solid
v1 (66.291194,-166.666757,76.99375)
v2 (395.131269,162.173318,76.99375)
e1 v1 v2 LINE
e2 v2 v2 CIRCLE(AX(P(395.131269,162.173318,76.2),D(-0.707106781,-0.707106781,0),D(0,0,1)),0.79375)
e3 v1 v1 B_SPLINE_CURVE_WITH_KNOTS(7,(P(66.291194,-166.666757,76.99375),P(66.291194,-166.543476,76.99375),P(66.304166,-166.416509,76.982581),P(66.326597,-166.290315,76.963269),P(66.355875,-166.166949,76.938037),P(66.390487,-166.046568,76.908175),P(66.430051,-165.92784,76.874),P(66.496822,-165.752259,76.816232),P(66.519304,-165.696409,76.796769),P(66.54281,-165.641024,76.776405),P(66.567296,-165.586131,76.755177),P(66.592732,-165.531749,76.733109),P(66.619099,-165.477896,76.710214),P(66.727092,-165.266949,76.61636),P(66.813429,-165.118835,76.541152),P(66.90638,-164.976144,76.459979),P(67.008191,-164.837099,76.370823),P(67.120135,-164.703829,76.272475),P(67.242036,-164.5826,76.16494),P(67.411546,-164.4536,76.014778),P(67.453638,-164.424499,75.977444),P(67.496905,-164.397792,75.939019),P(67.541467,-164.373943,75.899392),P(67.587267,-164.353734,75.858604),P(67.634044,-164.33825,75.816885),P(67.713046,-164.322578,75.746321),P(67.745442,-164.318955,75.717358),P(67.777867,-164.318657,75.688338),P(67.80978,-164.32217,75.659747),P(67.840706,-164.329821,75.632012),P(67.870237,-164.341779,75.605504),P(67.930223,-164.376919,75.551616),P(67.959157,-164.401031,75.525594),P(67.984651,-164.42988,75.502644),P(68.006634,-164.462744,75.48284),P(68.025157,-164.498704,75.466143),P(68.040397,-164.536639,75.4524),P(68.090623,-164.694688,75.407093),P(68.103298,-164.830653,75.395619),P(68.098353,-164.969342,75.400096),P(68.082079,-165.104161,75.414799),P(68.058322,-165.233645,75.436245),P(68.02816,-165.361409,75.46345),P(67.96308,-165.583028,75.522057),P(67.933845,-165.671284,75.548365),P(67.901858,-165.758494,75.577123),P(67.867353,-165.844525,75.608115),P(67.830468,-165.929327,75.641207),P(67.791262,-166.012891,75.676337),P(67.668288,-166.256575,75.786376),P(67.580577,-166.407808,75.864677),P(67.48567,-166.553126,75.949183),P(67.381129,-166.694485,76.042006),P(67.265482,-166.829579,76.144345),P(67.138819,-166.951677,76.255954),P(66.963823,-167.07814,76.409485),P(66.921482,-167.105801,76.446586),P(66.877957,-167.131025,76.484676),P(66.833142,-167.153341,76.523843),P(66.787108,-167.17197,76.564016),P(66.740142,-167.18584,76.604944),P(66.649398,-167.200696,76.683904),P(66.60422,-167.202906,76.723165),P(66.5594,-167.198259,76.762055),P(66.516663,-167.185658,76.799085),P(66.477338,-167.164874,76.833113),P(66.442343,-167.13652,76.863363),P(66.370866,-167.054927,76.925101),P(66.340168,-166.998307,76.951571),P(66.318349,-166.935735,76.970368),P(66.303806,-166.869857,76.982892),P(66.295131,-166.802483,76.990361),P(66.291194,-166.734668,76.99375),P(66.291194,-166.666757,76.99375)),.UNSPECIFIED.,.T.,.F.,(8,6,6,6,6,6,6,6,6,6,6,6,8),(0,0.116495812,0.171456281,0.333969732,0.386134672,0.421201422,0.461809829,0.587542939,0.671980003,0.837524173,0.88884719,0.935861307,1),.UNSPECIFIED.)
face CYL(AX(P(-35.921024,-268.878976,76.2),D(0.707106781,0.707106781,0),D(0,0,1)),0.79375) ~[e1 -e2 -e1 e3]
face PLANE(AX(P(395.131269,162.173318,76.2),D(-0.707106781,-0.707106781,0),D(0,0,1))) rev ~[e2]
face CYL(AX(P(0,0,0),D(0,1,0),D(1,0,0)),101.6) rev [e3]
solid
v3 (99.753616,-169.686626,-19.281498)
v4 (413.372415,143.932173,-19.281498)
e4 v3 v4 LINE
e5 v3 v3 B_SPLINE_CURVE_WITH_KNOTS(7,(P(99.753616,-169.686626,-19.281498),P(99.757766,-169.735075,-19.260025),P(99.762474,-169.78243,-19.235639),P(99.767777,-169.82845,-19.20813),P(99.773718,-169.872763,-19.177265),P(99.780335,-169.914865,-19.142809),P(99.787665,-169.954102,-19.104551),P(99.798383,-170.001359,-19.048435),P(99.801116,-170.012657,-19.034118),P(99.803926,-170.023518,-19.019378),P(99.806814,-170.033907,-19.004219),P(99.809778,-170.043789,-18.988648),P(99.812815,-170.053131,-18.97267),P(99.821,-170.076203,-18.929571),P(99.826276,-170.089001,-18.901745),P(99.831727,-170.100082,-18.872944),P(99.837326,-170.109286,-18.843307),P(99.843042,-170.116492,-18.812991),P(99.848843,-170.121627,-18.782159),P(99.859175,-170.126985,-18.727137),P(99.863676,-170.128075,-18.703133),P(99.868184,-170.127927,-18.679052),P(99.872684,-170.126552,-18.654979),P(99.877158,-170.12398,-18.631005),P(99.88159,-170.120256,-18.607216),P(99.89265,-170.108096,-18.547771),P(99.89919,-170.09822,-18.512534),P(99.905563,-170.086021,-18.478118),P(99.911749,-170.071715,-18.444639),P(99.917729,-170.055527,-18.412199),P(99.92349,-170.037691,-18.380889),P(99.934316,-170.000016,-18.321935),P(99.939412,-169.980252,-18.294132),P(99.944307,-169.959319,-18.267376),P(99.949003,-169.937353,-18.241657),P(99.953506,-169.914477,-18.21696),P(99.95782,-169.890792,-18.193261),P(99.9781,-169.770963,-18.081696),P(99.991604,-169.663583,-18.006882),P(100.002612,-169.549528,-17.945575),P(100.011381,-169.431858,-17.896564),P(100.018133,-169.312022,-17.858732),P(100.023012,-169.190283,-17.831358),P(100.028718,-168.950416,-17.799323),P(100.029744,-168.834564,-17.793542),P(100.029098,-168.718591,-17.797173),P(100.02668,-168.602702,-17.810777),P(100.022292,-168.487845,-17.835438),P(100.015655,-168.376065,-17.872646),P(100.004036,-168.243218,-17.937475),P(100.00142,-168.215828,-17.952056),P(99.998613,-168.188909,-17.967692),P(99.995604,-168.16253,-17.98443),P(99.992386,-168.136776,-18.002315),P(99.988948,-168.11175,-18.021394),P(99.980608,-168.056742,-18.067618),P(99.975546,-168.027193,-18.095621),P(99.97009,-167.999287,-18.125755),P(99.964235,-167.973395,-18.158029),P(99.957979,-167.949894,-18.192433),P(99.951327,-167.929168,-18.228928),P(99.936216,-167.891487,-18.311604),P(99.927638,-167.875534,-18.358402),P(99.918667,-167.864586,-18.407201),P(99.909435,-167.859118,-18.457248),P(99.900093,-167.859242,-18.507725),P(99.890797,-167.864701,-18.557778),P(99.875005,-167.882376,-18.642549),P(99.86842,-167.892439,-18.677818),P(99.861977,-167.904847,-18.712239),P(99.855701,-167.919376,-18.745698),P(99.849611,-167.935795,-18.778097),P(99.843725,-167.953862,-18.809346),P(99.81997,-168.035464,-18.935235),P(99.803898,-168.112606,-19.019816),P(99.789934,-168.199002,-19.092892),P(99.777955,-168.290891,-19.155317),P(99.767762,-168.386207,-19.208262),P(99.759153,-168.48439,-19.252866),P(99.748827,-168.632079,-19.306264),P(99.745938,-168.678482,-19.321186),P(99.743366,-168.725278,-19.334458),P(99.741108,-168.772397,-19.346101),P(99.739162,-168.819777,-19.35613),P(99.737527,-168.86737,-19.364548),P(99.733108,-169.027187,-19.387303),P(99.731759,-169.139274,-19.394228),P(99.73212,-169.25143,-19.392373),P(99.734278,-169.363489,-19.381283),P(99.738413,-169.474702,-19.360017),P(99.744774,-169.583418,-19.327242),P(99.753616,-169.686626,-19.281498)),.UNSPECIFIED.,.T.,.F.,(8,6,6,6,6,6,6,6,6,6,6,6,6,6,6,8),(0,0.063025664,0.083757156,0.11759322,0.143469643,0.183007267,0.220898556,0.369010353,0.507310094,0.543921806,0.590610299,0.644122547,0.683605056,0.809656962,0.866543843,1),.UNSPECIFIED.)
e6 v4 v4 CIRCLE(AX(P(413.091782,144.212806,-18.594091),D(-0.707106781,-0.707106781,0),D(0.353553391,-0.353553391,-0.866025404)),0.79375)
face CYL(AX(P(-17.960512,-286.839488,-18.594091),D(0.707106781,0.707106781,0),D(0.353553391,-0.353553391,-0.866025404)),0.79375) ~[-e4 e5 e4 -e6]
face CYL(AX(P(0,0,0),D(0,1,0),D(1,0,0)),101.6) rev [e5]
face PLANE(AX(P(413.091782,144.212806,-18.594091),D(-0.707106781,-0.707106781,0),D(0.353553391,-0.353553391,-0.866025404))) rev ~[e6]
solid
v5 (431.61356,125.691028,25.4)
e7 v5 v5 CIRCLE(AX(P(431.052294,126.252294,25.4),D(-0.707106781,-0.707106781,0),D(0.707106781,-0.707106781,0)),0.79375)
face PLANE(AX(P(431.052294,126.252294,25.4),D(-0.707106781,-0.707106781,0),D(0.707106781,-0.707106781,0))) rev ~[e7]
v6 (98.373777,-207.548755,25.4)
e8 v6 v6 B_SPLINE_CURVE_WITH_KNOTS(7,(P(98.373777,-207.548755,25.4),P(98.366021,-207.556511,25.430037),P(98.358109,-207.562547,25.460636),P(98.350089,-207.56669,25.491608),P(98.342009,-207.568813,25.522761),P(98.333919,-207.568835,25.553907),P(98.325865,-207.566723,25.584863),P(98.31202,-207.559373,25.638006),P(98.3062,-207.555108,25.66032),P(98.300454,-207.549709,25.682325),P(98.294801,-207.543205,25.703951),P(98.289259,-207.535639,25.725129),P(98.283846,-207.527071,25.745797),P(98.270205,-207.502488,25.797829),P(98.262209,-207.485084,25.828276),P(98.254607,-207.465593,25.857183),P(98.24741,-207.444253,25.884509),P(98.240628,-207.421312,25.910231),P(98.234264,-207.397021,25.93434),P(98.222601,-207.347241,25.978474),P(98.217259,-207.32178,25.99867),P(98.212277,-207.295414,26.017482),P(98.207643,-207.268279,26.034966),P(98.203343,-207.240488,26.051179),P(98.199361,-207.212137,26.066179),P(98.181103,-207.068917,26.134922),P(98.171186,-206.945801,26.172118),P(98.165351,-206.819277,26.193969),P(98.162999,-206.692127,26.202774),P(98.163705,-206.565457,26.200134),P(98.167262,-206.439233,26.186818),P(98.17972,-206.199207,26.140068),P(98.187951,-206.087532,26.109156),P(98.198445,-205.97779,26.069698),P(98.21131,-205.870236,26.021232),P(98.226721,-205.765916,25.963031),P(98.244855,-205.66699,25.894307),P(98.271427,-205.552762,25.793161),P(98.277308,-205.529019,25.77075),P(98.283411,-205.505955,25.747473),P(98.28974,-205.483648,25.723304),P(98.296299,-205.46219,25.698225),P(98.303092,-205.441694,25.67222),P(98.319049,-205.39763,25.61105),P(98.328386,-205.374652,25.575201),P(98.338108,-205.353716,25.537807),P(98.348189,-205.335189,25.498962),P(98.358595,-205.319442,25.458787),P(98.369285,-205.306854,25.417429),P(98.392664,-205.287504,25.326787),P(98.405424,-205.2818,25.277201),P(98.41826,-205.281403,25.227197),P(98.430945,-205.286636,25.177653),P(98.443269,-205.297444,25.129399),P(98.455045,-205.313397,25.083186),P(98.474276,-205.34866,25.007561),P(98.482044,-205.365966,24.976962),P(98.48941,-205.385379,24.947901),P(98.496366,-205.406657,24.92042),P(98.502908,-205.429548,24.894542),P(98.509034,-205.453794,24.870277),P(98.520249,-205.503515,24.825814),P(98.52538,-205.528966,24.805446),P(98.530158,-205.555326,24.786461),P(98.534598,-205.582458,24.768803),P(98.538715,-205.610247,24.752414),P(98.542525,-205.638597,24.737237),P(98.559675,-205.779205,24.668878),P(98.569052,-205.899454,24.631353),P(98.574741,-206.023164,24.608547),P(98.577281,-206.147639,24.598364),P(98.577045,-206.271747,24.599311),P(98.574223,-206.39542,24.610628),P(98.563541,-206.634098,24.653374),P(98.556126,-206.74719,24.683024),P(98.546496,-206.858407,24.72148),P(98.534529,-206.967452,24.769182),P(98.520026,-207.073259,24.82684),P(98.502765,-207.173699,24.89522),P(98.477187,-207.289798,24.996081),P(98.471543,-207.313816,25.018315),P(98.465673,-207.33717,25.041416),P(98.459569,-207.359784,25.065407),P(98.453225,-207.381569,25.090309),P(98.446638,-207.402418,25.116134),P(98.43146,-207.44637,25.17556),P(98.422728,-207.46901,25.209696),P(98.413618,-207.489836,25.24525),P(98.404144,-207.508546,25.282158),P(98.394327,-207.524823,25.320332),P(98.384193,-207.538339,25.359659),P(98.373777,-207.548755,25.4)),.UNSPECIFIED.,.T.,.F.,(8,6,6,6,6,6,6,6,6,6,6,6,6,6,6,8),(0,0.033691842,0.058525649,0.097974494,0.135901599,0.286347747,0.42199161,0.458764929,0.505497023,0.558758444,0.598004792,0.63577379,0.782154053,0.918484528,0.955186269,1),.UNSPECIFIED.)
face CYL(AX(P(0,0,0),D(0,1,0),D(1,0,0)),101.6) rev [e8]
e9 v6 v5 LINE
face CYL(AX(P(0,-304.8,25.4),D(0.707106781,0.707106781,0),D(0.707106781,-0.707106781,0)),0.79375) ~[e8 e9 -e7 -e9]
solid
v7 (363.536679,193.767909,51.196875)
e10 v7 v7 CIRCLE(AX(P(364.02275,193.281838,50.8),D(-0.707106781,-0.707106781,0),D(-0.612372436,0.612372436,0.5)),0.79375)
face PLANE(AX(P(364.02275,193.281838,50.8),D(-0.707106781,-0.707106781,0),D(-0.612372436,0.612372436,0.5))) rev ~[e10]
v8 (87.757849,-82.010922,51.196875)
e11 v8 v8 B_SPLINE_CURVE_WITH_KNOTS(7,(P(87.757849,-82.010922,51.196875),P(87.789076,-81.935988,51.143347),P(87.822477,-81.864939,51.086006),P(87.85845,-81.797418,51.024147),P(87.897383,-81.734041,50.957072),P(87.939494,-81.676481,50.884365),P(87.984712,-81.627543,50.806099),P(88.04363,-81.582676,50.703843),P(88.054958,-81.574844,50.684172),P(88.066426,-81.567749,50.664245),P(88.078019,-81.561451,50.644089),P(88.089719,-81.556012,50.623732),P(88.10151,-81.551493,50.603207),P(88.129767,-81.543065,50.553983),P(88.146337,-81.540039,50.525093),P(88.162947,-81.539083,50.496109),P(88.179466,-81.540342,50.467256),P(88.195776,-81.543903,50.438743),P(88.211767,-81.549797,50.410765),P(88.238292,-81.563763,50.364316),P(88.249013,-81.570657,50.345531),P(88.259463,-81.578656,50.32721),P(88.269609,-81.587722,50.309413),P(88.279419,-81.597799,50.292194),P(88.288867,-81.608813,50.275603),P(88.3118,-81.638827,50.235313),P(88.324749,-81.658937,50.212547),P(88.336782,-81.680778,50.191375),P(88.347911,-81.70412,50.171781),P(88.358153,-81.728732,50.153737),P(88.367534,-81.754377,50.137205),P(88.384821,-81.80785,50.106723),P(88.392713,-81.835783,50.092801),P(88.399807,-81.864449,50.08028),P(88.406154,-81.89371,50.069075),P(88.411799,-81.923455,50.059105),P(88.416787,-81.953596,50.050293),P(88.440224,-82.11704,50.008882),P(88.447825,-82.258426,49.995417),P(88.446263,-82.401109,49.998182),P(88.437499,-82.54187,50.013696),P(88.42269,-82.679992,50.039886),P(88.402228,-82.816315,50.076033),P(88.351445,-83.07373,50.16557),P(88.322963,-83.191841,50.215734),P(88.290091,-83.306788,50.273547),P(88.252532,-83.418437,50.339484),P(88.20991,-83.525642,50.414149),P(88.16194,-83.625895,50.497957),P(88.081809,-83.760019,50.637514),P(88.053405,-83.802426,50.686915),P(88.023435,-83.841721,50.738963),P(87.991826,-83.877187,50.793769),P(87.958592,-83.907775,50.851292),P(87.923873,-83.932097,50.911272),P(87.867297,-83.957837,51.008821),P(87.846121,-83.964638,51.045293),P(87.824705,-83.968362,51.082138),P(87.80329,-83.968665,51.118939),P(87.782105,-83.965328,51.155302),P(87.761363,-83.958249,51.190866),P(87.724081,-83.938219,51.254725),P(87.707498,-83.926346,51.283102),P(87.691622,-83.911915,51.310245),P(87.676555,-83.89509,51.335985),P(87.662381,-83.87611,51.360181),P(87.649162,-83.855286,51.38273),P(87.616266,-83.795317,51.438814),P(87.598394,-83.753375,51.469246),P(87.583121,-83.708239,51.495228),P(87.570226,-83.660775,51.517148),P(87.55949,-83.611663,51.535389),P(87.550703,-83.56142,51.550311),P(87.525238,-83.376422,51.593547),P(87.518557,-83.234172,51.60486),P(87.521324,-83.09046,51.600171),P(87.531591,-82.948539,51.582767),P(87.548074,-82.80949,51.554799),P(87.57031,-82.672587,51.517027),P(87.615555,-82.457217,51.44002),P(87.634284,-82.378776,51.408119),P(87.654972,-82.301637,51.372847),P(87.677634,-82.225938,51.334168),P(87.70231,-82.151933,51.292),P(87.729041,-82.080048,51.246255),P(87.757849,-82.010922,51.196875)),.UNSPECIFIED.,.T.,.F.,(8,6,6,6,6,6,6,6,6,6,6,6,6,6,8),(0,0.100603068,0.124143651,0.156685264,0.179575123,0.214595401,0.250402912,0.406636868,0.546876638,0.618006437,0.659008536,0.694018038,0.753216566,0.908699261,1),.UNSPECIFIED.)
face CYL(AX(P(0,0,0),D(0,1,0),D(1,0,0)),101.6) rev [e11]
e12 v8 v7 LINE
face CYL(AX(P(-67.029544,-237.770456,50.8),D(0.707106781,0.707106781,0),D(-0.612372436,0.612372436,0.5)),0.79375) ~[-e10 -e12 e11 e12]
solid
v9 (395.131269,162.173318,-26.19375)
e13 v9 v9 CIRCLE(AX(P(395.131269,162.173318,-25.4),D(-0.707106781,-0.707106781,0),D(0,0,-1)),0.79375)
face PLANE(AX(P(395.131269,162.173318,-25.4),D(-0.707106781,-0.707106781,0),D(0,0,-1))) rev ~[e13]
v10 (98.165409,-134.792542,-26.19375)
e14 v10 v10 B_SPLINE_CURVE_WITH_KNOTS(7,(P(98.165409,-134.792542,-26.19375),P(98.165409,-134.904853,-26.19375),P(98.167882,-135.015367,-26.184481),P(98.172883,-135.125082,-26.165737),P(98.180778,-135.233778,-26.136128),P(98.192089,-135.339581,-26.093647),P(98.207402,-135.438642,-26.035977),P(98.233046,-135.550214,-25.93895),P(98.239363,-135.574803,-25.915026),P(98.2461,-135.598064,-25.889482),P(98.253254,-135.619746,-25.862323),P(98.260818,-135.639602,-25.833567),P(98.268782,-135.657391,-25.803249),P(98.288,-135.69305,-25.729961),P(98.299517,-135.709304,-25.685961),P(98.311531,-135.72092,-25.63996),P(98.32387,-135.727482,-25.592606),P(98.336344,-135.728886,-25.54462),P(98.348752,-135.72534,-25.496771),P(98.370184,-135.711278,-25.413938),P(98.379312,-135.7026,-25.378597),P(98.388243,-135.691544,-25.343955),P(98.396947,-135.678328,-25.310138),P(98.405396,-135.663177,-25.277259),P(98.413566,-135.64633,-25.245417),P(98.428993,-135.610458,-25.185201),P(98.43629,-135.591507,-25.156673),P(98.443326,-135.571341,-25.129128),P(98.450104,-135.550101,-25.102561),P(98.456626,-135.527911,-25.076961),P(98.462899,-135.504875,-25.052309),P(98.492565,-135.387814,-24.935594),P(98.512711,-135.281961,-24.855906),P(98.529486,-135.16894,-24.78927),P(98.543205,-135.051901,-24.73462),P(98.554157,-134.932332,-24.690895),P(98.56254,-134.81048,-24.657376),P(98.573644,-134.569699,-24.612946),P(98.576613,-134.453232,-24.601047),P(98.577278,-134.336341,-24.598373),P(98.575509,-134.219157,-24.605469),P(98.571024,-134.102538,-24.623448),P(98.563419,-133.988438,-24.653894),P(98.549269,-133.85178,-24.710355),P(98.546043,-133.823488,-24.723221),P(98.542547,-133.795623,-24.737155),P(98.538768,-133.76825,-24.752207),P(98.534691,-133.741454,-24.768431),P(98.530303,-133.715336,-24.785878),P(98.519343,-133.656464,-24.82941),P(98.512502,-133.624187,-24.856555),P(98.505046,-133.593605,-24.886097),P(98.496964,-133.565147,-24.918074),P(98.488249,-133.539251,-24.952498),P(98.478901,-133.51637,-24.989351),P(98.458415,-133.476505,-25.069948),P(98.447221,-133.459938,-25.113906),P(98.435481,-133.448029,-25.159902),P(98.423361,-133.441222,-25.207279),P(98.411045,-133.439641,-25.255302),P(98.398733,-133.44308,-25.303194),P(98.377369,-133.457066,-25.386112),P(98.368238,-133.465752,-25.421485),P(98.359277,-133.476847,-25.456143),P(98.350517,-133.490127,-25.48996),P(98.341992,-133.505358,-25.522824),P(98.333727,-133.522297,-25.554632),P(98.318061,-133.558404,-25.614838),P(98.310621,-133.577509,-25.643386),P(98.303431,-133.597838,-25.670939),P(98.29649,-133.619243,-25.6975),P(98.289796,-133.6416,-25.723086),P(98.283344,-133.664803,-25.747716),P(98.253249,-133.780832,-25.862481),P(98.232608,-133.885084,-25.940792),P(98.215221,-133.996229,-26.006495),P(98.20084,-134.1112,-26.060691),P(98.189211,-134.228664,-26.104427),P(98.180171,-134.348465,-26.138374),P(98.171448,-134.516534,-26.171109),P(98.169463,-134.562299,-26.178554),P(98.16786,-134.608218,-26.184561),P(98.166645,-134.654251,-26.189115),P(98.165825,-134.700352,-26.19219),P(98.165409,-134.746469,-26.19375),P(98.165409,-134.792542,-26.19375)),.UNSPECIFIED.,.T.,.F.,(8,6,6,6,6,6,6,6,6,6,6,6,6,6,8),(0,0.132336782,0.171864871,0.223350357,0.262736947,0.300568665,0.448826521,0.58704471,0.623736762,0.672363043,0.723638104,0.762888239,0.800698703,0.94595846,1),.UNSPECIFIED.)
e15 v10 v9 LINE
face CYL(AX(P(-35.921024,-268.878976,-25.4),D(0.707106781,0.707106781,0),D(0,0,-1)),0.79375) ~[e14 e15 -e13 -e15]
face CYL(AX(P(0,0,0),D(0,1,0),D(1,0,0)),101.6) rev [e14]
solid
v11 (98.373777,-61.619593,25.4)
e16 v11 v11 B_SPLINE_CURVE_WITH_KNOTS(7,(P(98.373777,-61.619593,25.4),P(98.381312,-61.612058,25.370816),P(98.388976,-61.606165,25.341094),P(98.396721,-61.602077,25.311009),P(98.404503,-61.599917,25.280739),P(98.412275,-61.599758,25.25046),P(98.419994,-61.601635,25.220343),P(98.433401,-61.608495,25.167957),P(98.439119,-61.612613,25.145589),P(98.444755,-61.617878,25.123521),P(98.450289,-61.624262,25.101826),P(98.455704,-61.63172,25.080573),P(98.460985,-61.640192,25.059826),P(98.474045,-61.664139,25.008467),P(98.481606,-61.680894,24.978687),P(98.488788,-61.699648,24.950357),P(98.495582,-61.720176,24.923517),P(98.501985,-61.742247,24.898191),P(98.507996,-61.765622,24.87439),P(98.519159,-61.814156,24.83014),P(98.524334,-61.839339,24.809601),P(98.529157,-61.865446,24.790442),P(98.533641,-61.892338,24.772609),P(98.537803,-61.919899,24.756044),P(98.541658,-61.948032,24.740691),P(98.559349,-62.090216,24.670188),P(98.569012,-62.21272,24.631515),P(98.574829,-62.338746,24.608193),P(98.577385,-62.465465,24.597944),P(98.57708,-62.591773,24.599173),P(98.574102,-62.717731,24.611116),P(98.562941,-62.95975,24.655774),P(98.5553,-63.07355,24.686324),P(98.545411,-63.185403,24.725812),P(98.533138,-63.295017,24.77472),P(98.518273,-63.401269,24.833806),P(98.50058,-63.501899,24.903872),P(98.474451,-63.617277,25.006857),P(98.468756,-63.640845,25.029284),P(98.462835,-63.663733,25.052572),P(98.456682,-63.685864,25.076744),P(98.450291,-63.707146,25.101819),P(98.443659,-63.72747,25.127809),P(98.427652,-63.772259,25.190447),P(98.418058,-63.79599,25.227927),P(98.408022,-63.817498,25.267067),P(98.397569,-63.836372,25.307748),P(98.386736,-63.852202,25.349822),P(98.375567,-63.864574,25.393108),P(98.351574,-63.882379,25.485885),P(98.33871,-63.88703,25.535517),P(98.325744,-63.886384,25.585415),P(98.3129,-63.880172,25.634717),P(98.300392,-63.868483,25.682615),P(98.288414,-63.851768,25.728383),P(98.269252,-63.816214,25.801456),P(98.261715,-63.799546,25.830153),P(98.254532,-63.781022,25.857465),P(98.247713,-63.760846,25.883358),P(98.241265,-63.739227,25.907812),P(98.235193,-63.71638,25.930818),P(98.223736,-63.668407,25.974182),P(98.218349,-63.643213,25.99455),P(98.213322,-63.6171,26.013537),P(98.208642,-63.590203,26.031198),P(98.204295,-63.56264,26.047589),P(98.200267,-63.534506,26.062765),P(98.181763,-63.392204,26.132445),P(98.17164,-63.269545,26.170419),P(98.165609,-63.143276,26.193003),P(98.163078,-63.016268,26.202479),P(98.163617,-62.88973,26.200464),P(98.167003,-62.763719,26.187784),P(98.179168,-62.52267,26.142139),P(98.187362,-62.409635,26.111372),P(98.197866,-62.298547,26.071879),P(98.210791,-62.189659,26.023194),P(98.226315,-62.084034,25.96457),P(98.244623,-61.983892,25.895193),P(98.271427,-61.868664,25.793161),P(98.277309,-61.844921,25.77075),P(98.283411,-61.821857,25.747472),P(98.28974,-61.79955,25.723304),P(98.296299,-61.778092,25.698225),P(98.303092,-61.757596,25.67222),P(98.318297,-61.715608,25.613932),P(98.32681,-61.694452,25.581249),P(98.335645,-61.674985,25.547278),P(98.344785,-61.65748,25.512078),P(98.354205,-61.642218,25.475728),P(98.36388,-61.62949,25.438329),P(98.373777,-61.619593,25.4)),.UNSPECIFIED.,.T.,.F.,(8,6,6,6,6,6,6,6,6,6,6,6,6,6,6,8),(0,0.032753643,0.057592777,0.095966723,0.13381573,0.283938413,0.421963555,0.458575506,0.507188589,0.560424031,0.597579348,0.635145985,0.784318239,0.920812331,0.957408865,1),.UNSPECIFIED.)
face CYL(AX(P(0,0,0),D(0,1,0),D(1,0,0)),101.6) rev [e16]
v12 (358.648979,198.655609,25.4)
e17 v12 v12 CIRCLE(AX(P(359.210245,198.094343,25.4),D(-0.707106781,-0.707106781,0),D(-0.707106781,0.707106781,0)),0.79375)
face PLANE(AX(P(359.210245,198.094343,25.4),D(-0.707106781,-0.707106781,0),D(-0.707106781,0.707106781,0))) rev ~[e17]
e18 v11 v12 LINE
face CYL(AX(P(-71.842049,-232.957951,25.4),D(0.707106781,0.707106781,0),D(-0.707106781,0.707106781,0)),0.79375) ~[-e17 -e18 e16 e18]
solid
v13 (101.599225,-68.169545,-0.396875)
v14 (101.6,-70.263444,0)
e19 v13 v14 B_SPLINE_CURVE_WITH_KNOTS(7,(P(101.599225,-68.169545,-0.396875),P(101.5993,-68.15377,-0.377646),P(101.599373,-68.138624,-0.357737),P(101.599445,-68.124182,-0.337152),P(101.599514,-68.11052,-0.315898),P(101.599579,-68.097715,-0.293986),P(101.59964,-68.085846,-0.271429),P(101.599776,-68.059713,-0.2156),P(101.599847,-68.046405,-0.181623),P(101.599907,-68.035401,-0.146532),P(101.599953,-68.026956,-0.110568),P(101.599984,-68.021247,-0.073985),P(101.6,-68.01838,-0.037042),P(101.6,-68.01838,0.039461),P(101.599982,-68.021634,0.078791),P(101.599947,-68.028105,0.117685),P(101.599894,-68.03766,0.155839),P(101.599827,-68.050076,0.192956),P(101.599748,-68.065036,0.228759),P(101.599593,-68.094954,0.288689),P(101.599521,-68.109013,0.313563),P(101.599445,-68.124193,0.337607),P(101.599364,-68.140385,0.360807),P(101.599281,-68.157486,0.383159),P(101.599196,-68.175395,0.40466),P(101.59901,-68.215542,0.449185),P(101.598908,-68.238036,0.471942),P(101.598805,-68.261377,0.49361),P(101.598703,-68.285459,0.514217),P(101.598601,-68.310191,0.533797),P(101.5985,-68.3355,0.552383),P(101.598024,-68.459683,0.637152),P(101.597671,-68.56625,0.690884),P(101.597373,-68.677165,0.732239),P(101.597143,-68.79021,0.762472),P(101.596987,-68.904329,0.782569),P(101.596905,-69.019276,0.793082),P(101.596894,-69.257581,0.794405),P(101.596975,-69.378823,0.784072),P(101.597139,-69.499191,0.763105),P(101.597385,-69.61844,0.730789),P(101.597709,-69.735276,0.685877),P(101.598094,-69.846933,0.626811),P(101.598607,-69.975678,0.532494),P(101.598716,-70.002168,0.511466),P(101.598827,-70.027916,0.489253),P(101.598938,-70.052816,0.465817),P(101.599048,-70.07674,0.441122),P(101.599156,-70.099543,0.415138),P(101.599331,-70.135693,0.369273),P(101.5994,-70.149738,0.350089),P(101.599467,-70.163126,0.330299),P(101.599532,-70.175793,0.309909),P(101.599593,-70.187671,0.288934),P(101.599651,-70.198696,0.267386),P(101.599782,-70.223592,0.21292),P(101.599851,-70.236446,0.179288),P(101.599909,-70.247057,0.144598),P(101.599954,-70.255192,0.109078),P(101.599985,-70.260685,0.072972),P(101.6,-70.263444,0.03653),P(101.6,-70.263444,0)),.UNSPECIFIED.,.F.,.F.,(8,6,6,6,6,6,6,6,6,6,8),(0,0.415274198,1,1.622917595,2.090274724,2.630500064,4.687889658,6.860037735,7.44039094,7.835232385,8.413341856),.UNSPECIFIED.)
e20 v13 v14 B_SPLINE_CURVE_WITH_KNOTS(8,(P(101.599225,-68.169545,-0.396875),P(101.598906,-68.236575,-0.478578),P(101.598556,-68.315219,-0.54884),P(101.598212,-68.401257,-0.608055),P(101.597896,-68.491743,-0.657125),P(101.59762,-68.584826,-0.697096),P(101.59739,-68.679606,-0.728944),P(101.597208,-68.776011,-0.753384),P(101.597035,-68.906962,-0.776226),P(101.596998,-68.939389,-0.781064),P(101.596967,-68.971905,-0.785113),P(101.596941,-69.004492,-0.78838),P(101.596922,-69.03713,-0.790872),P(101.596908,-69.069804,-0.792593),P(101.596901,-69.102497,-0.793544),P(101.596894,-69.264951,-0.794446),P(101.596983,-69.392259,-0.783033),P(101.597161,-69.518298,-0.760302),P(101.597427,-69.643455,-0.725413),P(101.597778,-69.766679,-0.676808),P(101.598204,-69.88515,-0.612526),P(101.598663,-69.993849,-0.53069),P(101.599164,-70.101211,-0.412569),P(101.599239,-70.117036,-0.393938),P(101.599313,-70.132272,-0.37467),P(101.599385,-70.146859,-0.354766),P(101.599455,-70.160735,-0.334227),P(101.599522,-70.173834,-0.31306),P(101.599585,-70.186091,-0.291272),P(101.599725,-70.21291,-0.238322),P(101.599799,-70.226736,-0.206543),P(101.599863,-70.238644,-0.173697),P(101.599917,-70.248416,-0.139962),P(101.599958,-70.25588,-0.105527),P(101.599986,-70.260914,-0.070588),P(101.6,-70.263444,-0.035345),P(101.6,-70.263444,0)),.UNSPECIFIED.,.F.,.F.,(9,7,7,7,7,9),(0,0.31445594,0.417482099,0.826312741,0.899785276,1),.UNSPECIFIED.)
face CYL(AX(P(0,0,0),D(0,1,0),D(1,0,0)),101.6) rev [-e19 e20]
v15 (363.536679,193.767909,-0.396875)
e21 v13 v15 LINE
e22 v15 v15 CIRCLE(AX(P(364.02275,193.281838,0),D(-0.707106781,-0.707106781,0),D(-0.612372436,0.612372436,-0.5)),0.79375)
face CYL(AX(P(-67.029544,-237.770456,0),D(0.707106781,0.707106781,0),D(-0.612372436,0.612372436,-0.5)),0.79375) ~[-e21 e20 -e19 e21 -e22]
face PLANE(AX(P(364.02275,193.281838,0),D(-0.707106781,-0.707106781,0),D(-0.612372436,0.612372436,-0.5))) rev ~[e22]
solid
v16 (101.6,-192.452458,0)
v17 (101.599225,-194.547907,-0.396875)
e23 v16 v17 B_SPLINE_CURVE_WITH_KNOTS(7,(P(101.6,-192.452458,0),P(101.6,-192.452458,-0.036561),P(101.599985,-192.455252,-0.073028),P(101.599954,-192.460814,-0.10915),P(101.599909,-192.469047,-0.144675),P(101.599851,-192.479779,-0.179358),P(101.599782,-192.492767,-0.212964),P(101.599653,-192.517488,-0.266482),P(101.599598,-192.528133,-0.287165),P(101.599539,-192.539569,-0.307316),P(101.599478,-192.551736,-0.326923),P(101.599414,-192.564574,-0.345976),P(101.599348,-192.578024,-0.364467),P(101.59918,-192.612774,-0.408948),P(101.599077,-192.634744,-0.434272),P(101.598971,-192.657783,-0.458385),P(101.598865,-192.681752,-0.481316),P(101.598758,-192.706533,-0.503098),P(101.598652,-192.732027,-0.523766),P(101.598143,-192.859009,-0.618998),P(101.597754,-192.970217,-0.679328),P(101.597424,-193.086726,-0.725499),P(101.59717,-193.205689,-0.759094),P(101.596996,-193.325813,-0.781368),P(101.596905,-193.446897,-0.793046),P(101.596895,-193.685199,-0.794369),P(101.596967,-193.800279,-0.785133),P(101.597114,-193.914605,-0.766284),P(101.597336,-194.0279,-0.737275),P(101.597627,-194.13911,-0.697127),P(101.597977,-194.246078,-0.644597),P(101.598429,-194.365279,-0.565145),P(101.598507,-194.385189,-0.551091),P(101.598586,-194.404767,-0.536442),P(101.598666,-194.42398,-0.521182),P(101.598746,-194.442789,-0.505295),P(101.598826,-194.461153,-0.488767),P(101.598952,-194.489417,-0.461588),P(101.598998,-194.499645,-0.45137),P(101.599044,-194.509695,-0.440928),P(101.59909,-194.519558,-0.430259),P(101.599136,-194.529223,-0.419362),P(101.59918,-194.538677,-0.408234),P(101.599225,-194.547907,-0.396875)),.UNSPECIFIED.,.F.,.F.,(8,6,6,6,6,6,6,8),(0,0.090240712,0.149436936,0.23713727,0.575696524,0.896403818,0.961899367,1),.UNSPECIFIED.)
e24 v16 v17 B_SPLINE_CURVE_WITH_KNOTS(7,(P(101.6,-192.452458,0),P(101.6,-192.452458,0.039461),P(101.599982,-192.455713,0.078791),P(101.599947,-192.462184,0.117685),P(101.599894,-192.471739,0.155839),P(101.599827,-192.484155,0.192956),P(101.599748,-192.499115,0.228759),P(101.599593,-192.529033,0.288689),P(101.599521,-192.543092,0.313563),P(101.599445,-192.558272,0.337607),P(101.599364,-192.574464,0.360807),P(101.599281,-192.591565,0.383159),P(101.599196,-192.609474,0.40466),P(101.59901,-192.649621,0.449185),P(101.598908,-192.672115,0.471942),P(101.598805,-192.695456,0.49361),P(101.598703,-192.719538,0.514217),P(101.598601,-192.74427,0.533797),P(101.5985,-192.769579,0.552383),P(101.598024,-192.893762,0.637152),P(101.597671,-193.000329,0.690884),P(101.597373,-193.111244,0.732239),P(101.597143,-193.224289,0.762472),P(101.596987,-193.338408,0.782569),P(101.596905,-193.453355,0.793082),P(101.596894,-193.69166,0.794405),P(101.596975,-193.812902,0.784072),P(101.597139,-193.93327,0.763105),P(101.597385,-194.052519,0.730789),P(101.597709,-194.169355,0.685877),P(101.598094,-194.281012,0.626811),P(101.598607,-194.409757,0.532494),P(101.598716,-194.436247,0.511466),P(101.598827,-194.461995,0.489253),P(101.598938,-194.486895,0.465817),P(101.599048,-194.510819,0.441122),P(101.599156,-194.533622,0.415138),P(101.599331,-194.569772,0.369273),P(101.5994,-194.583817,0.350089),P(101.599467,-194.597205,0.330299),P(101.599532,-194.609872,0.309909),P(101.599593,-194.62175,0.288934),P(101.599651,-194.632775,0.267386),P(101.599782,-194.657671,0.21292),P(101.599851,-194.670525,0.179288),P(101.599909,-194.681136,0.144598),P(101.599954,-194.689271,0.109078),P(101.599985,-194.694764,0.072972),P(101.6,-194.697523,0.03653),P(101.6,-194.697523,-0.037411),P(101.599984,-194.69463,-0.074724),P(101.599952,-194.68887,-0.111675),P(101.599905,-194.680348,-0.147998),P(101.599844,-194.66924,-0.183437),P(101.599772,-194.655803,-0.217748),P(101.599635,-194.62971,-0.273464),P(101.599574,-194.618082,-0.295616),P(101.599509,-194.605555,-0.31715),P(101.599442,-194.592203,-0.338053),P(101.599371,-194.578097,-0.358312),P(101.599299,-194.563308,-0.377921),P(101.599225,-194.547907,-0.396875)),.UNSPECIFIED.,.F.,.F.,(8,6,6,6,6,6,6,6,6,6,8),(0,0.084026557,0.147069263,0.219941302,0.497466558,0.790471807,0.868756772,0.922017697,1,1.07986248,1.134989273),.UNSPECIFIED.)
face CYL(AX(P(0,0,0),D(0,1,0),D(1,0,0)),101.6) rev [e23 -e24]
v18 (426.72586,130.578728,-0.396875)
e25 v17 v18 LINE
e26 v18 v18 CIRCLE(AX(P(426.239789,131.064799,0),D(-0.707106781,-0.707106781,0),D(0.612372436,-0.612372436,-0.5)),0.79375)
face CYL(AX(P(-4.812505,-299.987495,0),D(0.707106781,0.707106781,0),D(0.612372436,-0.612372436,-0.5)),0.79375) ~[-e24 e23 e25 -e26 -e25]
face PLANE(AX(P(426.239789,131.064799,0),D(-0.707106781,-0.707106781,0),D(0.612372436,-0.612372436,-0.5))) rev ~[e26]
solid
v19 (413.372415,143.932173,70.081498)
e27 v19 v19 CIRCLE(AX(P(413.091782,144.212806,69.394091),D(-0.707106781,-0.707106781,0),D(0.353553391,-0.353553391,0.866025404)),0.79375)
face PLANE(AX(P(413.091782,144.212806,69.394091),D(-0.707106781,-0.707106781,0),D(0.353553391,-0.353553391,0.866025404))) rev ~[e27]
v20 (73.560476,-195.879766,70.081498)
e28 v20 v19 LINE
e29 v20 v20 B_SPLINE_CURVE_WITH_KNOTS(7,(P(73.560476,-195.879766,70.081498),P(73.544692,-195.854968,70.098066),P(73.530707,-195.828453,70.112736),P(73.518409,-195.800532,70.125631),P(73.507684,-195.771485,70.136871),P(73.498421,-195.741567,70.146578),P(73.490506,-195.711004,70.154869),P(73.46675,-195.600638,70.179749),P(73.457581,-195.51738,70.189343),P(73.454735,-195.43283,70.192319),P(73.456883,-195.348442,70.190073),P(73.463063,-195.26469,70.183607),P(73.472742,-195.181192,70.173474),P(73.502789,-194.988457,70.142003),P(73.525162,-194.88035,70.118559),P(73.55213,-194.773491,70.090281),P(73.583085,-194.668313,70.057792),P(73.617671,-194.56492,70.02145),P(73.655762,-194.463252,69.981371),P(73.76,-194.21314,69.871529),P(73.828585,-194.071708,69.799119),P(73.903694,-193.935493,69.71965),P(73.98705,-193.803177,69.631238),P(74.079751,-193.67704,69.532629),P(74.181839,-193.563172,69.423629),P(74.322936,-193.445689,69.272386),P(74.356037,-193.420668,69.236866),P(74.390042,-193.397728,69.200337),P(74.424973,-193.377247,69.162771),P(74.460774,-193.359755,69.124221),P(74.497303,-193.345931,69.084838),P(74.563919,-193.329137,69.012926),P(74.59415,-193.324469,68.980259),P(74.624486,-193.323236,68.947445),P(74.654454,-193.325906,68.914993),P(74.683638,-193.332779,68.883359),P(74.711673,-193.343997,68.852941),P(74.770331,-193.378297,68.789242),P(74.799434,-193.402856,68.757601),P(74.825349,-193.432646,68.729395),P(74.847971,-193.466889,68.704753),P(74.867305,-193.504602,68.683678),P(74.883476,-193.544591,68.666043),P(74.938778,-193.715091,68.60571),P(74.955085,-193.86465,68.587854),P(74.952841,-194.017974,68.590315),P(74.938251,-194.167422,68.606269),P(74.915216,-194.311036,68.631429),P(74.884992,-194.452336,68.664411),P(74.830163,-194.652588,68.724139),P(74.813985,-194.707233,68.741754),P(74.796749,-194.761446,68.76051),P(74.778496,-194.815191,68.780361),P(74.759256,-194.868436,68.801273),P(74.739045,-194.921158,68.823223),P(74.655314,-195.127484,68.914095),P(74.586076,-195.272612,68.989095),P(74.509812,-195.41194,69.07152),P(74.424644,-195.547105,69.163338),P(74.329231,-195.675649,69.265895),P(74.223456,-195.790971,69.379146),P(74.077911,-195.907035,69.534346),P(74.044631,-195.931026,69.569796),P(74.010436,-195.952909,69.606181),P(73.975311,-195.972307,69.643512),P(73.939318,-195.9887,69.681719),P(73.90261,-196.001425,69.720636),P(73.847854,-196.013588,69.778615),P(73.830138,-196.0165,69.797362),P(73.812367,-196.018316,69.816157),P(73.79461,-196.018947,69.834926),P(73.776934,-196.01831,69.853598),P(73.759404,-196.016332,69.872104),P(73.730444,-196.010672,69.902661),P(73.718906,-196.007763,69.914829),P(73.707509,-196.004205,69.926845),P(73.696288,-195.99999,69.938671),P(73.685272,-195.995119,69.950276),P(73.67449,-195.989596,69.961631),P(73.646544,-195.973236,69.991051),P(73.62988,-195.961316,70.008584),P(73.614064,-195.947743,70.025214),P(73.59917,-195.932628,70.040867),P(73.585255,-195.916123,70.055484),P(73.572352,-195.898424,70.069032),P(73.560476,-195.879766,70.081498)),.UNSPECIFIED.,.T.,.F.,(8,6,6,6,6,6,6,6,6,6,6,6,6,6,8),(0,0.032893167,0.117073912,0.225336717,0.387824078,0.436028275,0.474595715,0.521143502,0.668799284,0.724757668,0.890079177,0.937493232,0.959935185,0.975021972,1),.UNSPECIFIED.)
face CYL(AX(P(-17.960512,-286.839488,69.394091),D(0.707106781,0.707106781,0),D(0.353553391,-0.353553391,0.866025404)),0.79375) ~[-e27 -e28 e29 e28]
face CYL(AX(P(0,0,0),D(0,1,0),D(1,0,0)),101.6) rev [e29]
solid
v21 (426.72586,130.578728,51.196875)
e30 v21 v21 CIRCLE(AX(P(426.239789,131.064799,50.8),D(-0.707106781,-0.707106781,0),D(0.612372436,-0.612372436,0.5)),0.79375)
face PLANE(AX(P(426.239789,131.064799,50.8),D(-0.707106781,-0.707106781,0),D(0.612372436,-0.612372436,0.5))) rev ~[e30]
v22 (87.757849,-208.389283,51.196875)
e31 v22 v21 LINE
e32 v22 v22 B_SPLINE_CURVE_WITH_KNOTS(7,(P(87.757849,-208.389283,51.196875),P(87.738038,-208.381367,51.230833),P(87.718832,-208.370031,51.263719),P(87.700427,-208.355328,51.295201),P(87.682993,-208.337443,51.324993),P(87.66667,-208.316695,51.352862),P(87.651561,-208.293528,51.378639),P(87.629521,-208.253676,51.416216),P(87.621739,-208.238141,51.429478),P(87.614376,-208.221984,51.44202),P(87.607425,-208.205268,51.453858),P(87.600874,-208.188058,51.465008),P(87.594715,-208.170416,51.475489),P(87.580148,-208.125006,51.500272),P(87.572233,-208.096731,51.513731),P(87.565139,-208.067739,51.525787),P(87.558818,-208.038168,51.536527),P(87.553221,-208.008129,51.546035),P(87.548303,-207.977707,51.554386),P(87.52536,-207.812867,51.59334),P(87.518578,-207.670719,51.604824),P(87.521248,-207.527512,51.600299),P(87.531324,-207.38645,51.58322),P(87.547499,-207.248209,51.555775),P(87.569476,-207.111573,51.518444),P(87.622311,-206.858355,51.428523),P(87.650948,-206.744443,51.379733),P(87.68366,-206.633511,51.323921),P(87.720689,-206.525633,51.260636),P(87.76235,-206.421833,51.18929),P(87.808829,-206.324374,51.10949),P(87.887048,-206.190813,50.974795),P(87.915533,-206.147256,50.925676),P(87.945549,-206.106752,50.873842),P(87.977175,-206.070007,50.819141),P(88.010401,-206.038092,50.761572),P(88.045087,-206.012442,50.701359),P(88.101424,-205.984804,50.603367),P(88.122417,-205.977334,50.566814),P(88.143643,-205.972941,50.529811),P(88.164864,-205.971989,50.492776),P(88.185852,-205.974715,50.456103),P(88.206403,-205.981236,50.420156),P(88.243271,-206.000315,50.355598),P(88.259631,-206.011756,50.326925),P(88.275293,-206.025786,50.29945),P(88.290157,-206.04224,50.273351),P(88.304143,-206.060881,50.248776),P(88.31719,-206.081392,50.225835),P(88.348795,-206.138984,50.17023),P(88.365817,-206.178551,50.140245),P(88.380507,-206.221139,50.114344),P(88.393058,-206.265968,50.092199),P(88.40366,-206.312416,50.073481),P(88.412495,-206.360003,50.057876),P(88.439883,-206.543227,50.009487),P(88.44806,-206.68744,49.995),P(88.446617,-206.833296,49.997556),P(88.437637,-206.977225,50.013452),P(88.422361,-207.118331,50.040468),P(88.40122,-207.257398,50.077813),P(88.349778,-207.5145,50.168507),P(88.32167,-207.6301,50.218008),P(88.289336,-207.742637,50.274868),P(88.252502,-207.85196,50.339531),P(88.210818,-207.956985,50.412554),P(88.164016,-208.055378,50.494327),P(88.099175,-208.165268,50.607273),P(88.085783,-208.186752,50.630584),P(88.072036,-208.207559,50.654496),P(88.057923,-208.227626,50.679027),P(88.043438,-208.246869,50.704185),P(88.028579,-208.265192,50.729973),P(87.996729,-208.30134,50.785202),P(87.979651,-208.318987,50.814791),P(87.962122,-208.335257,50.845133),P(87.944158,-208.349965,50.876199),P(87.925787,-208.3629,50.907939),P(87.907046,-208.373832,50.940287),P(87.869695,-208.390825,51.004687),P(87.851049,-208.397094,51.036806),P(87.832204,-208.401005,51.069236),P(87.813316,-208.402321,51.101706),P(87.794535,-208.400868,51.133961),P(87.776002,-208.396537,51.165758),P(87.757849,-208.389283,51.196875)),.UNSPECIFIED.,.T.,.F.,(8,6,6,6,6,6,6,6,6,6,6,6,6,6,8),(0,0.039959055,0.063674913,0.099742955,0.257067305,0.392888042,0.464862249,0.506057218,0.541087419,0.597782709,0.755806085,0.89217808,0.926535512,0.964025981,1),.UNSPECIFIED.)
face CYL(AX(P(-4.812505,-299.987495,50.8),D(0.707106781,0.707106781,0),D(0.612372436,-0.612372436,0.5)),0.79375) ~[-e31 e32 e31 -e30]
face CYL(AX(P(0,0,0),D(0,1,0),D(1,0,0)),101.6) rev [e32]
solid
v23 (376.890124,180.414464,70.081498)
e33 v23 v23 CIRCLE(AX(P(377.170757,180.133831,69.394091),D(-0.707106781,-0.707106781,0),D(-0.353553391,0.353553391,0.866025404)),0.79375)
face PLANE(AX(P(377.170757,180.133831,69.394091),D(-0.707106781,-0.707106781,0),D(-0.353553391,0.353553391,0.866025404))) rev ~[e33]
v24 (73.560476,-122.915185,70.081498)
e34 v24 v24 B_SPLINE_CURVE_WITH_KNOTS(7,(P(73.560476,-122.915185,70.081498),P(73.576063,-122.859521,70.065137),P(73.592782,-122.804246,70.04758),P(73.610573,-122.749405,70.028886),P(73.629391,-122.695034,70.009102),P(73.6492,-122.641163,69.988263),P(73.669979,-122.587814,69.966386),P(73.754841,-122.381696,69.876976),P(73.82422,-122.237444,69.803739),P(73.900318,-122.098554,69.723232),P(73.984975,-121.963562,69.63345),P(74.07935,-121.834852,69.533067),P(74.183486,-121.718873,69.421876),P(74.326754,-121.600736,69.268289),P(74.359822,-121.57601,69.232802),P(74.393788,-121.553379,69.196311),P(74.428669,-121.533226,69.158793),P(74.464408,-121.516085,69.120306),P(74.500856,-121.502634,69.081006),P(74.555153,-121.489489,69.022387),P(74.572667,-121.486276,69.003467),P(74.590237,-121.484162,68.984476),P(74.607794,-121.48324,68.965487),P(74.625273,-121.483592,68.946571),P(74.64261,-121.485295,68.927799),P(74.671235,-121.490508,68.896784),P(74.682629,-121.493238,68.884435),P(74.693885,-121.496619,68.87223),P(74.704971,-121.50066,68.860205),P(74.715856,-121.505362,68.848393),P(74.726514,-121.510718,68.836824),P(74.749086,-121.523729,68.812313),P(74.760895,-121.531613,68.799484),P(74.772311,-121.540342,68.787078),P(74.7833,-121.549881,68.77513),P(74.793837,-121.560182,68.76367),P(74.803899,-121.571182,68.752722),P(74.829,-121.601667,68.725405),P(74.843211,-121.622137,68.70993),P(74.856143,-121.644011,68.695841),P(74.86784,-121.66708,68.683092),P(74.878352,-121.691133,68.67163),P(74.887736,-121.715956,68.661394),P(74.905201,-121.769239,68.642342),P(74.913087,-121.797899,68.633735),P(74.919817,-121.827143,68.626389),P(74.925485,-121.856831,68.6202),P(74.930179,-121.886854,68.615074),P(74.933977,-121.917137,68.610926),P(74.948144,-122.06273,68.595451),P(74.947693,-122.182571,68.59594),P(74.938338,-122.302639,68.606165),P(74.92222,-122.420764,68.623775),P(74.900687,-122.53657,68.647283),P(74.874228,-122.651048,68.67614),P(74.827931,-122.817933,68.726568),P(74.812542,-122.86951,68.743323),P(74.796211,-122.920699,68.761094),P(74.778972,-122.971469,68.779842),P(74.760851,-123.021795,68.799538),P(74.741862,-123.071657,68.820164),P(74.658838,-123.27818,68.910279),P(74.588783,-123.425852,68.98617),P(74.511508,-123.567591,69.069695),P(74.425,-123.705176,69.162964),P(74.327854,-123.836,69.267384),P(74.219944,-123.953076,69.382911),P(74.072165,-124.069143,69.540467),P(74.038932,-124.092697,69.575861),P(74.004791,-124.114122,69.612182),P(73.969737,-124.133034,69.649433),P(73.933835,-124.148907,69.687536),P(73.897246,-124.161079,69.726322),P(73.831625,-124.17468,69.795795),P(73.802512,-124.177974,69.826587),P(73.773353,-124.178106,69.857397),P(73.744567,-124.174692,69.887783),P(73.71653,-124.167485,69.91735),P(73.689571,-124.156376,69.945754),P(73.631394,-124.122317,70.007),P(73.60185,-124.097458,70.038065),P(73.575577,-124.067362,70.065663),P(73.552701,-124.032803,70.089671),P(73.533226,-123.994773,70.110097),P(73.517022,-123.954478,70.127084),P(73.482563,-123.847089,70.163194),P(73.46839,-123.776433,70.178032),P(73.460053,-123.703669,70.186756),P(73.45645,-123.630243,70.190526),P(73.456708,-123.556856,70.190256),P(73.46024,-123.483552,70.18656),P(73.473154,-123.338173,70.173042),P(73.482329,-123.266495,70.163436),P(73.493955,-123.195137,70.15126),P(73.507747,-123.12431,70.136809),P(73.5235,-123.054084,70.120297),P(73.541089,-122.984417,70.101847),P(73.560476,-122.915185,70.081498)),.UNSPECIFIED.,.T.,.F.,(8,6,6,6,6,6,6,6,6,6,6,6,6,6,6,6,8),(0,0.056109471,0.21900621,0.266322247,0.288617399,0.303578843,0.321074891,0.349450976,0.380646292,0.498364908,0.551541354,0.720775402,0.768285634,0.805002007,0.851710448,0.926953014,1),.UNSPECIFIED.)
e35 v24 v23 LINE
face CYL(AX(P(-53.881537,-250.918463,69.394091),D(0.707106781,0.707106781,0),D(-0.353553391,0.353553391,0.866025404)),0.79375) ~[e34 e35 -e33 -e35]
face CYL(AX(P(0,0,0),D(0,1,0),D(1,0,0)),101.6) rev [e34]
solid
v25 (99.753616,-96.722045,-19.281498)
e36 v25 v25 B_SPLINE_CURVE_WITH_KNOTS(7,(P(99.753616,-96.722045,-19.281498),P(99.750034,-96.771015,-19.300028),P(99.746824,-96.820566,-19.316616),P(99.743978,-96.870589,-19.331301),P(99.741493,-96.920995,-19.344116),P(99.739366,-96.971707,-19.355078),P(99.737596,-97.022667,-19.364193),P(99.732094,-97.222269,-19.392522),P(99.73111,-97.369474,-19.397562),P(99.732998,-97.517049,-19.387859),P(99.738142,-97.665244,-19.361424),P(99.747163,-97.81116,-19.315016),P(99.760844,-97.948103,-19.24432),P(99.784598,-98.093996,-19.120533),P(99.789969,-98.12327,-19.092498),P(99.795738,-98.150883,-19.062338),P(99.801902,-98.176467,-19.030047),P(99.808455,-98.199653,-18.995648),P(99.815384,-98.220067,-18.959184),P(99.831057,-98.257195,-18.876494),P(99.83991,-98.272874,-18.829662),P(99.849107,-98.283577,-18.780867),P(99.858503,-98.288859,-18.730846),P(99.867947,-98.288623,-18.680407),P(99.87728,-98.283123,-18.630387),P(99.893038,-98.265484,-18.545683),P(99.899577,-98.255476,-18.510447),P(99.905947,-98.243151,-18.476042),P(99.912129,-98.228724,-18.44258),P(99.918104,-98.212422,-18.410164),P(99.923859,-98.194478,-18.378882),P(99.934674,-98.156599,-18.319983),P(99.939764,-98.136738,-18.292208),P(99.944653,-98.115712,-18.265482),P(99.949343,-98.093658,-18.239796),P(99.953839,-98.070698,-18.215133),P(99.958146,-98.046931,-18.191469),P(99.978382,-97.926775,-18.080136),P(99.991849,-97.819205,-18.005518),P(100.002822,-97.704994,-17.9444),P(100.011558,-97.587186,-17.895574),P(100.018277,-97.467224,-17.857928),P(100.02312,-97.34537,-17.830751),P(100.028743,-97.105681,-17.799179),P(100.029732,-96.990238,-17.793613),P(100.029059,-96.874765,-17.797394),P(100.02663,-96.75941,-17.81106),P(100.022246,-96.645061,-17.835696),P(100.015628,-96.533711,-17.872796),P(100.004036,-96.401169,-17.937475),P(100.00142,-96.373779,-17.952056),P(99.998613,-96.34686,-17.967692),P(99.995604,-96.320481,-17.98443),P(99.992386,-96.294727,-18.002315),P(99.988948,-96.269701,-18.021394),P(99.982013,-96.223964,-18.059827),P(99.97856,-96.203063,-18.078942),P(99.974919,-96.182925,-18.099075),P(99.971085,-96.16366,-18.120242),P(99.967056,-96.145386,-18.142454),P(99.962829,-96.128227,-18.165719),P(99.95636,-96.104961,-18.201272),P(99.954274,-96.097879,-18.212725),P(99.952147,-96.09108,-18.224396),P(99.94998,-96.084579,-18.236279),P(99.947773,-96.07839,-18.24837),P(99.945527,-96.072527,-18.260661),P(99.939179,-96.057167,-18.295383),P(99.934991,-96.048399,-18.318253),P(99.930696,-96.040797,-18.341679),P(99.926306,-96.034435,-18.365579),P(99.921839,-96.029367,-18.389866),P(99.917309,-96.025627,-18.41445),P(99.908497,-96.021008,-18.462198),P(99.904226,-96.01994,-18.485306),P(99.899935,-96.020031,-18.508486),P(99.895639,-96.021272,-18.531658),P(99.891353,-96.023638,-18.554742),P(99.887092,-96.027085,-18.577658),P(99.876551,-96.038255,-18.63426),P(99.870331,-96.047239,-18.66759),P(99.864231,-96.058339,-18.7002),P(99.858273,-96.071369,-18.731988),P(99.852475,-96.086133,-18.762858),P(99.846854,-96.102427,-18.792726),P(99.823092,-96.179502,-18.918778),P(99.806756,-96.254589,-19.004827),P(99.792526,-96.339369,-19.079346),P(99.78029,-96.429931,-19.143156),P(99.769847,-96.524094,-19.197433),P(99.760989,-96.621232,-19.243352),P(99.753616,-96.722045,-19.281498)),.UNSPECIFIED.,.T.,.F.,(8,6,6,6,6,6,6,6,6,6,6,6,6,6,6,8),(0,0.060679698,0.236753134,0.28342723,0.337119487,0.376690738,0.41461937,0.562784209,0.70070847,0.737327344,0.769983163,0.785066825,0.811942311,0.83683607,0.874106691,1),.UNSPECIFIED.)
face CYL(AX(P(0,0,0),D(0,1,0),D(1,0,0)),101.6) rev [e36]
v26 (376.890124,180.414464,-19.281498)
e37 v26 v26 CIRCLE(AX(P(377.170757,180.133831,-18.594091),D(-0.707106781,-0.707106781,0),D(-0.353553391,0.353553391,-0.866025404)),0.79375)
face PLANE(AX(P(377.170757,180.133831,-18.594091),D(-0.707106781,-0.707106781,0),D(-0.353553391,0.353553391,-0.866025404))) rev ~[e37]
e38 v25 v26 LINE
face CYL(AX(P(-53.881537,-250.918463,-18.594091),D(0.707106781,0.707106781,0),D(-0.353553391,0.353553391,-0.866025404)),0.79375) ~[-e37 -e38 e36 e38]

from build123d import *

# Parameters (mm, degrees)
F5_COUNT = 12
F6_R     = 101.6
F7_DEPTH = 305.3622660076


# Not quite as in the source:
# - the program builds the solid bodies; features that only make, move or delete a surface that nothing else refers to are left out


with BuildPart() as f4:
    # F3 (on offset) → F4 (revolve)
    with BuildSketch(Plane.XY.offset(25.4)):
        Polygon((0, -304.8), (0.5612660076, -305.3612660076), (431.6135598189, 125.6910278038), (431.0522938113, 126.2522938113), align=None)
    revolve(axis=Axis((215.5261469057, -89.2738530943, 25.4), (-0.7071067812, -0.7071067812, 0)))


with BuildPart() as f5_1:
    # F5: instance of F4
    add(f4.part.rotate(Axis((179.6051224214, -53.3528286101, 25.4), (0.7071067812, 0.7071067812, 0)), 1 * 360 / F5_COUNT))


with BuildPart() as f5_2:
    # F5: instance of F4
    add(f4.part.rotate(Axis((179.6051224214, -53.3528286101, 25.4), (0.7071067812, 0.7071067812, 0)), 2 * 360 / F5_COUNT))


with BuildPart() as f5_3:
    # F5: instance of F4
    add(f4.part.rotate(Axis((179.6051224214, -53.3528286101, 25.4), (0.7071067812, 0.7071067812, 0)), 3 * 360 / F5_COUNT))


with BuildPart() as f5_4:
    # F5: instance of F4
    add(f4.part.rotate(Axis((179.6051224214, -53.3528286101, 25.4), (0.7071067812, 0.7071067812, 0)), 4 * 360 / F5_COUNT))


with BuildPart() as f5_5:
    # F5: instance of F4
    add(f4.part.rotate(Axis((179.6051224214, -53.3528286101, 25.4), (0.7071067812, 0.7071067812, 0)), 5 * 360 / F5_COUNT))


with BuildPart() as f5_6:
    # F5: instance of F4
    add(f4.part.rotate(Axis((179.6051224214, -53.3528286101, 25.4), (0.7071067812, 0.7071067812, 0)), 6 * 360 / F5_COUNT))


with BuildPart() as f5_7:
    # F5: instance of F4
    add(f4.part.rotate(Axis((179.6051224214, -53.3528286101, 25.4), (0.7071067812, 0.7071067812, 0)), 7 * 360 / F5_COUNT))


with BuildPart() as f5_8:
    # F5: instance of F4
    add(f4.part.rotate(Axis((179.6051224214, -53.3528286101, 25.4), (0.7071067812, 0.7071067812, 0)), 8 * 360 / F5_COUNT))


with BuildPart() as f5_9:
    # F5: instance of F4
    add(f4.part.rotate(Axis((179.6051224214, -53.3528286101, 25.4), (0.7071067812, 0.7071067812, 0)), 9 * 360 / F5_COUNT))


with BuildPart() as f5_10:
    # F5: instance of F4
    add(f4.part.rotate(Axis((179.6051224214, -53.3528286101, 25.4), (0.7071067812, 0.7071067812, 0)), 10 * 360 / F5_COUNT))


with BuildPart() as f5_11:
    # F5: instance of F4
    add(f4.part.rotate(Axis((179.6051224214, -53.3528286101, 25.4), (0.7071067812, 0.7071067812, 0)), 11 * 360 / F5_COUNT))


with BuildPart() as f7_tool:
    # F6 (on Front) → F7 (new body, through all)
    with BuildSketch(Plane.XZ):
        Circle(F6_R)
    extrude(amount=F7_DEPTH)


with BuildPart() as f4_1:
    add(f4.part)

    # F7: cut by f7_tool
    add(f7_tool.part, mode=Mode.SUBTRACT)


with BuildPart() as f5_1_1:
    add(f5_1.part)

    # F7: cut by f7_tool
    add(f7_tool.part, mode=Mode.SUBTRACT)


with BuildPart() as f5_2_1:
    add(f5_2.part)

    # F7: cut by f7_tool
    add(f7_tool.part, mode=Mode.SUBTRACT)


with BuildPart() as f5_3_1:
    add(f5_3.part)

    # F7: cut by f7_tool
    add(f7_tool.part, mode=Mode.SUBTRACT)


with BuildPart() as f5_4_1:
    add(f5_4.part)

    # F7: cut by f7_tool
    add(f7_tool.part, mode=Mode.SUBTRACT)


with BuildPart() as f5_5_1:
    add(f5_5.part)

    # F7: cut by f7_tool
    add(f7_tool.part, mode=Mode.SUBTRACT)


with BuildPart() as f5_6_1:
    add(f5_6.part)

    # F7: cut by f7_tool
    add(f7_tool.part, mode=Mode.SUBTRACT)


with BuildPart() as f5_7_1:
    add(f5_7.part)

    # F7: cut by f7_tool
    add(f7_tool.part, mode=Mode.SUBTRACT)


with BuildPart() as f5_8_1:
    add(f5_8.part)

    # F7: cut by f7_tool
    add(f7_tool.part, mode=Mode.SUBTRACT)


with BuildPart() as f5_9_1:
    add(f5_9.part)

    # F7: cut by f7_tool
    add(f7_tool.part, mode=Mode.SUBTRACT)


with BuildPart() as f5_10_1:
    add(f5_10.part)

    # F7: cut by f7_tool
    add(f7_tool.part, mode=Mode.SUBTRACT)


with BuildPart() as f5_11_1:
    add(f5_11.part)

    # F7: cut by f7_tool
    add(f7_tool.part, mode=Mode.SUBTRACT)


solid = Compound([f4_1.part, f5_1_1.part, f5_2_1.part, f5_3_1.part, f5_4_1.part, f5_5_1.part, f5_6_1.part, f5_7_1.part, f5_8_1.part, f5_9_1.part, f5_10_1.part, f5_11_1.part])
